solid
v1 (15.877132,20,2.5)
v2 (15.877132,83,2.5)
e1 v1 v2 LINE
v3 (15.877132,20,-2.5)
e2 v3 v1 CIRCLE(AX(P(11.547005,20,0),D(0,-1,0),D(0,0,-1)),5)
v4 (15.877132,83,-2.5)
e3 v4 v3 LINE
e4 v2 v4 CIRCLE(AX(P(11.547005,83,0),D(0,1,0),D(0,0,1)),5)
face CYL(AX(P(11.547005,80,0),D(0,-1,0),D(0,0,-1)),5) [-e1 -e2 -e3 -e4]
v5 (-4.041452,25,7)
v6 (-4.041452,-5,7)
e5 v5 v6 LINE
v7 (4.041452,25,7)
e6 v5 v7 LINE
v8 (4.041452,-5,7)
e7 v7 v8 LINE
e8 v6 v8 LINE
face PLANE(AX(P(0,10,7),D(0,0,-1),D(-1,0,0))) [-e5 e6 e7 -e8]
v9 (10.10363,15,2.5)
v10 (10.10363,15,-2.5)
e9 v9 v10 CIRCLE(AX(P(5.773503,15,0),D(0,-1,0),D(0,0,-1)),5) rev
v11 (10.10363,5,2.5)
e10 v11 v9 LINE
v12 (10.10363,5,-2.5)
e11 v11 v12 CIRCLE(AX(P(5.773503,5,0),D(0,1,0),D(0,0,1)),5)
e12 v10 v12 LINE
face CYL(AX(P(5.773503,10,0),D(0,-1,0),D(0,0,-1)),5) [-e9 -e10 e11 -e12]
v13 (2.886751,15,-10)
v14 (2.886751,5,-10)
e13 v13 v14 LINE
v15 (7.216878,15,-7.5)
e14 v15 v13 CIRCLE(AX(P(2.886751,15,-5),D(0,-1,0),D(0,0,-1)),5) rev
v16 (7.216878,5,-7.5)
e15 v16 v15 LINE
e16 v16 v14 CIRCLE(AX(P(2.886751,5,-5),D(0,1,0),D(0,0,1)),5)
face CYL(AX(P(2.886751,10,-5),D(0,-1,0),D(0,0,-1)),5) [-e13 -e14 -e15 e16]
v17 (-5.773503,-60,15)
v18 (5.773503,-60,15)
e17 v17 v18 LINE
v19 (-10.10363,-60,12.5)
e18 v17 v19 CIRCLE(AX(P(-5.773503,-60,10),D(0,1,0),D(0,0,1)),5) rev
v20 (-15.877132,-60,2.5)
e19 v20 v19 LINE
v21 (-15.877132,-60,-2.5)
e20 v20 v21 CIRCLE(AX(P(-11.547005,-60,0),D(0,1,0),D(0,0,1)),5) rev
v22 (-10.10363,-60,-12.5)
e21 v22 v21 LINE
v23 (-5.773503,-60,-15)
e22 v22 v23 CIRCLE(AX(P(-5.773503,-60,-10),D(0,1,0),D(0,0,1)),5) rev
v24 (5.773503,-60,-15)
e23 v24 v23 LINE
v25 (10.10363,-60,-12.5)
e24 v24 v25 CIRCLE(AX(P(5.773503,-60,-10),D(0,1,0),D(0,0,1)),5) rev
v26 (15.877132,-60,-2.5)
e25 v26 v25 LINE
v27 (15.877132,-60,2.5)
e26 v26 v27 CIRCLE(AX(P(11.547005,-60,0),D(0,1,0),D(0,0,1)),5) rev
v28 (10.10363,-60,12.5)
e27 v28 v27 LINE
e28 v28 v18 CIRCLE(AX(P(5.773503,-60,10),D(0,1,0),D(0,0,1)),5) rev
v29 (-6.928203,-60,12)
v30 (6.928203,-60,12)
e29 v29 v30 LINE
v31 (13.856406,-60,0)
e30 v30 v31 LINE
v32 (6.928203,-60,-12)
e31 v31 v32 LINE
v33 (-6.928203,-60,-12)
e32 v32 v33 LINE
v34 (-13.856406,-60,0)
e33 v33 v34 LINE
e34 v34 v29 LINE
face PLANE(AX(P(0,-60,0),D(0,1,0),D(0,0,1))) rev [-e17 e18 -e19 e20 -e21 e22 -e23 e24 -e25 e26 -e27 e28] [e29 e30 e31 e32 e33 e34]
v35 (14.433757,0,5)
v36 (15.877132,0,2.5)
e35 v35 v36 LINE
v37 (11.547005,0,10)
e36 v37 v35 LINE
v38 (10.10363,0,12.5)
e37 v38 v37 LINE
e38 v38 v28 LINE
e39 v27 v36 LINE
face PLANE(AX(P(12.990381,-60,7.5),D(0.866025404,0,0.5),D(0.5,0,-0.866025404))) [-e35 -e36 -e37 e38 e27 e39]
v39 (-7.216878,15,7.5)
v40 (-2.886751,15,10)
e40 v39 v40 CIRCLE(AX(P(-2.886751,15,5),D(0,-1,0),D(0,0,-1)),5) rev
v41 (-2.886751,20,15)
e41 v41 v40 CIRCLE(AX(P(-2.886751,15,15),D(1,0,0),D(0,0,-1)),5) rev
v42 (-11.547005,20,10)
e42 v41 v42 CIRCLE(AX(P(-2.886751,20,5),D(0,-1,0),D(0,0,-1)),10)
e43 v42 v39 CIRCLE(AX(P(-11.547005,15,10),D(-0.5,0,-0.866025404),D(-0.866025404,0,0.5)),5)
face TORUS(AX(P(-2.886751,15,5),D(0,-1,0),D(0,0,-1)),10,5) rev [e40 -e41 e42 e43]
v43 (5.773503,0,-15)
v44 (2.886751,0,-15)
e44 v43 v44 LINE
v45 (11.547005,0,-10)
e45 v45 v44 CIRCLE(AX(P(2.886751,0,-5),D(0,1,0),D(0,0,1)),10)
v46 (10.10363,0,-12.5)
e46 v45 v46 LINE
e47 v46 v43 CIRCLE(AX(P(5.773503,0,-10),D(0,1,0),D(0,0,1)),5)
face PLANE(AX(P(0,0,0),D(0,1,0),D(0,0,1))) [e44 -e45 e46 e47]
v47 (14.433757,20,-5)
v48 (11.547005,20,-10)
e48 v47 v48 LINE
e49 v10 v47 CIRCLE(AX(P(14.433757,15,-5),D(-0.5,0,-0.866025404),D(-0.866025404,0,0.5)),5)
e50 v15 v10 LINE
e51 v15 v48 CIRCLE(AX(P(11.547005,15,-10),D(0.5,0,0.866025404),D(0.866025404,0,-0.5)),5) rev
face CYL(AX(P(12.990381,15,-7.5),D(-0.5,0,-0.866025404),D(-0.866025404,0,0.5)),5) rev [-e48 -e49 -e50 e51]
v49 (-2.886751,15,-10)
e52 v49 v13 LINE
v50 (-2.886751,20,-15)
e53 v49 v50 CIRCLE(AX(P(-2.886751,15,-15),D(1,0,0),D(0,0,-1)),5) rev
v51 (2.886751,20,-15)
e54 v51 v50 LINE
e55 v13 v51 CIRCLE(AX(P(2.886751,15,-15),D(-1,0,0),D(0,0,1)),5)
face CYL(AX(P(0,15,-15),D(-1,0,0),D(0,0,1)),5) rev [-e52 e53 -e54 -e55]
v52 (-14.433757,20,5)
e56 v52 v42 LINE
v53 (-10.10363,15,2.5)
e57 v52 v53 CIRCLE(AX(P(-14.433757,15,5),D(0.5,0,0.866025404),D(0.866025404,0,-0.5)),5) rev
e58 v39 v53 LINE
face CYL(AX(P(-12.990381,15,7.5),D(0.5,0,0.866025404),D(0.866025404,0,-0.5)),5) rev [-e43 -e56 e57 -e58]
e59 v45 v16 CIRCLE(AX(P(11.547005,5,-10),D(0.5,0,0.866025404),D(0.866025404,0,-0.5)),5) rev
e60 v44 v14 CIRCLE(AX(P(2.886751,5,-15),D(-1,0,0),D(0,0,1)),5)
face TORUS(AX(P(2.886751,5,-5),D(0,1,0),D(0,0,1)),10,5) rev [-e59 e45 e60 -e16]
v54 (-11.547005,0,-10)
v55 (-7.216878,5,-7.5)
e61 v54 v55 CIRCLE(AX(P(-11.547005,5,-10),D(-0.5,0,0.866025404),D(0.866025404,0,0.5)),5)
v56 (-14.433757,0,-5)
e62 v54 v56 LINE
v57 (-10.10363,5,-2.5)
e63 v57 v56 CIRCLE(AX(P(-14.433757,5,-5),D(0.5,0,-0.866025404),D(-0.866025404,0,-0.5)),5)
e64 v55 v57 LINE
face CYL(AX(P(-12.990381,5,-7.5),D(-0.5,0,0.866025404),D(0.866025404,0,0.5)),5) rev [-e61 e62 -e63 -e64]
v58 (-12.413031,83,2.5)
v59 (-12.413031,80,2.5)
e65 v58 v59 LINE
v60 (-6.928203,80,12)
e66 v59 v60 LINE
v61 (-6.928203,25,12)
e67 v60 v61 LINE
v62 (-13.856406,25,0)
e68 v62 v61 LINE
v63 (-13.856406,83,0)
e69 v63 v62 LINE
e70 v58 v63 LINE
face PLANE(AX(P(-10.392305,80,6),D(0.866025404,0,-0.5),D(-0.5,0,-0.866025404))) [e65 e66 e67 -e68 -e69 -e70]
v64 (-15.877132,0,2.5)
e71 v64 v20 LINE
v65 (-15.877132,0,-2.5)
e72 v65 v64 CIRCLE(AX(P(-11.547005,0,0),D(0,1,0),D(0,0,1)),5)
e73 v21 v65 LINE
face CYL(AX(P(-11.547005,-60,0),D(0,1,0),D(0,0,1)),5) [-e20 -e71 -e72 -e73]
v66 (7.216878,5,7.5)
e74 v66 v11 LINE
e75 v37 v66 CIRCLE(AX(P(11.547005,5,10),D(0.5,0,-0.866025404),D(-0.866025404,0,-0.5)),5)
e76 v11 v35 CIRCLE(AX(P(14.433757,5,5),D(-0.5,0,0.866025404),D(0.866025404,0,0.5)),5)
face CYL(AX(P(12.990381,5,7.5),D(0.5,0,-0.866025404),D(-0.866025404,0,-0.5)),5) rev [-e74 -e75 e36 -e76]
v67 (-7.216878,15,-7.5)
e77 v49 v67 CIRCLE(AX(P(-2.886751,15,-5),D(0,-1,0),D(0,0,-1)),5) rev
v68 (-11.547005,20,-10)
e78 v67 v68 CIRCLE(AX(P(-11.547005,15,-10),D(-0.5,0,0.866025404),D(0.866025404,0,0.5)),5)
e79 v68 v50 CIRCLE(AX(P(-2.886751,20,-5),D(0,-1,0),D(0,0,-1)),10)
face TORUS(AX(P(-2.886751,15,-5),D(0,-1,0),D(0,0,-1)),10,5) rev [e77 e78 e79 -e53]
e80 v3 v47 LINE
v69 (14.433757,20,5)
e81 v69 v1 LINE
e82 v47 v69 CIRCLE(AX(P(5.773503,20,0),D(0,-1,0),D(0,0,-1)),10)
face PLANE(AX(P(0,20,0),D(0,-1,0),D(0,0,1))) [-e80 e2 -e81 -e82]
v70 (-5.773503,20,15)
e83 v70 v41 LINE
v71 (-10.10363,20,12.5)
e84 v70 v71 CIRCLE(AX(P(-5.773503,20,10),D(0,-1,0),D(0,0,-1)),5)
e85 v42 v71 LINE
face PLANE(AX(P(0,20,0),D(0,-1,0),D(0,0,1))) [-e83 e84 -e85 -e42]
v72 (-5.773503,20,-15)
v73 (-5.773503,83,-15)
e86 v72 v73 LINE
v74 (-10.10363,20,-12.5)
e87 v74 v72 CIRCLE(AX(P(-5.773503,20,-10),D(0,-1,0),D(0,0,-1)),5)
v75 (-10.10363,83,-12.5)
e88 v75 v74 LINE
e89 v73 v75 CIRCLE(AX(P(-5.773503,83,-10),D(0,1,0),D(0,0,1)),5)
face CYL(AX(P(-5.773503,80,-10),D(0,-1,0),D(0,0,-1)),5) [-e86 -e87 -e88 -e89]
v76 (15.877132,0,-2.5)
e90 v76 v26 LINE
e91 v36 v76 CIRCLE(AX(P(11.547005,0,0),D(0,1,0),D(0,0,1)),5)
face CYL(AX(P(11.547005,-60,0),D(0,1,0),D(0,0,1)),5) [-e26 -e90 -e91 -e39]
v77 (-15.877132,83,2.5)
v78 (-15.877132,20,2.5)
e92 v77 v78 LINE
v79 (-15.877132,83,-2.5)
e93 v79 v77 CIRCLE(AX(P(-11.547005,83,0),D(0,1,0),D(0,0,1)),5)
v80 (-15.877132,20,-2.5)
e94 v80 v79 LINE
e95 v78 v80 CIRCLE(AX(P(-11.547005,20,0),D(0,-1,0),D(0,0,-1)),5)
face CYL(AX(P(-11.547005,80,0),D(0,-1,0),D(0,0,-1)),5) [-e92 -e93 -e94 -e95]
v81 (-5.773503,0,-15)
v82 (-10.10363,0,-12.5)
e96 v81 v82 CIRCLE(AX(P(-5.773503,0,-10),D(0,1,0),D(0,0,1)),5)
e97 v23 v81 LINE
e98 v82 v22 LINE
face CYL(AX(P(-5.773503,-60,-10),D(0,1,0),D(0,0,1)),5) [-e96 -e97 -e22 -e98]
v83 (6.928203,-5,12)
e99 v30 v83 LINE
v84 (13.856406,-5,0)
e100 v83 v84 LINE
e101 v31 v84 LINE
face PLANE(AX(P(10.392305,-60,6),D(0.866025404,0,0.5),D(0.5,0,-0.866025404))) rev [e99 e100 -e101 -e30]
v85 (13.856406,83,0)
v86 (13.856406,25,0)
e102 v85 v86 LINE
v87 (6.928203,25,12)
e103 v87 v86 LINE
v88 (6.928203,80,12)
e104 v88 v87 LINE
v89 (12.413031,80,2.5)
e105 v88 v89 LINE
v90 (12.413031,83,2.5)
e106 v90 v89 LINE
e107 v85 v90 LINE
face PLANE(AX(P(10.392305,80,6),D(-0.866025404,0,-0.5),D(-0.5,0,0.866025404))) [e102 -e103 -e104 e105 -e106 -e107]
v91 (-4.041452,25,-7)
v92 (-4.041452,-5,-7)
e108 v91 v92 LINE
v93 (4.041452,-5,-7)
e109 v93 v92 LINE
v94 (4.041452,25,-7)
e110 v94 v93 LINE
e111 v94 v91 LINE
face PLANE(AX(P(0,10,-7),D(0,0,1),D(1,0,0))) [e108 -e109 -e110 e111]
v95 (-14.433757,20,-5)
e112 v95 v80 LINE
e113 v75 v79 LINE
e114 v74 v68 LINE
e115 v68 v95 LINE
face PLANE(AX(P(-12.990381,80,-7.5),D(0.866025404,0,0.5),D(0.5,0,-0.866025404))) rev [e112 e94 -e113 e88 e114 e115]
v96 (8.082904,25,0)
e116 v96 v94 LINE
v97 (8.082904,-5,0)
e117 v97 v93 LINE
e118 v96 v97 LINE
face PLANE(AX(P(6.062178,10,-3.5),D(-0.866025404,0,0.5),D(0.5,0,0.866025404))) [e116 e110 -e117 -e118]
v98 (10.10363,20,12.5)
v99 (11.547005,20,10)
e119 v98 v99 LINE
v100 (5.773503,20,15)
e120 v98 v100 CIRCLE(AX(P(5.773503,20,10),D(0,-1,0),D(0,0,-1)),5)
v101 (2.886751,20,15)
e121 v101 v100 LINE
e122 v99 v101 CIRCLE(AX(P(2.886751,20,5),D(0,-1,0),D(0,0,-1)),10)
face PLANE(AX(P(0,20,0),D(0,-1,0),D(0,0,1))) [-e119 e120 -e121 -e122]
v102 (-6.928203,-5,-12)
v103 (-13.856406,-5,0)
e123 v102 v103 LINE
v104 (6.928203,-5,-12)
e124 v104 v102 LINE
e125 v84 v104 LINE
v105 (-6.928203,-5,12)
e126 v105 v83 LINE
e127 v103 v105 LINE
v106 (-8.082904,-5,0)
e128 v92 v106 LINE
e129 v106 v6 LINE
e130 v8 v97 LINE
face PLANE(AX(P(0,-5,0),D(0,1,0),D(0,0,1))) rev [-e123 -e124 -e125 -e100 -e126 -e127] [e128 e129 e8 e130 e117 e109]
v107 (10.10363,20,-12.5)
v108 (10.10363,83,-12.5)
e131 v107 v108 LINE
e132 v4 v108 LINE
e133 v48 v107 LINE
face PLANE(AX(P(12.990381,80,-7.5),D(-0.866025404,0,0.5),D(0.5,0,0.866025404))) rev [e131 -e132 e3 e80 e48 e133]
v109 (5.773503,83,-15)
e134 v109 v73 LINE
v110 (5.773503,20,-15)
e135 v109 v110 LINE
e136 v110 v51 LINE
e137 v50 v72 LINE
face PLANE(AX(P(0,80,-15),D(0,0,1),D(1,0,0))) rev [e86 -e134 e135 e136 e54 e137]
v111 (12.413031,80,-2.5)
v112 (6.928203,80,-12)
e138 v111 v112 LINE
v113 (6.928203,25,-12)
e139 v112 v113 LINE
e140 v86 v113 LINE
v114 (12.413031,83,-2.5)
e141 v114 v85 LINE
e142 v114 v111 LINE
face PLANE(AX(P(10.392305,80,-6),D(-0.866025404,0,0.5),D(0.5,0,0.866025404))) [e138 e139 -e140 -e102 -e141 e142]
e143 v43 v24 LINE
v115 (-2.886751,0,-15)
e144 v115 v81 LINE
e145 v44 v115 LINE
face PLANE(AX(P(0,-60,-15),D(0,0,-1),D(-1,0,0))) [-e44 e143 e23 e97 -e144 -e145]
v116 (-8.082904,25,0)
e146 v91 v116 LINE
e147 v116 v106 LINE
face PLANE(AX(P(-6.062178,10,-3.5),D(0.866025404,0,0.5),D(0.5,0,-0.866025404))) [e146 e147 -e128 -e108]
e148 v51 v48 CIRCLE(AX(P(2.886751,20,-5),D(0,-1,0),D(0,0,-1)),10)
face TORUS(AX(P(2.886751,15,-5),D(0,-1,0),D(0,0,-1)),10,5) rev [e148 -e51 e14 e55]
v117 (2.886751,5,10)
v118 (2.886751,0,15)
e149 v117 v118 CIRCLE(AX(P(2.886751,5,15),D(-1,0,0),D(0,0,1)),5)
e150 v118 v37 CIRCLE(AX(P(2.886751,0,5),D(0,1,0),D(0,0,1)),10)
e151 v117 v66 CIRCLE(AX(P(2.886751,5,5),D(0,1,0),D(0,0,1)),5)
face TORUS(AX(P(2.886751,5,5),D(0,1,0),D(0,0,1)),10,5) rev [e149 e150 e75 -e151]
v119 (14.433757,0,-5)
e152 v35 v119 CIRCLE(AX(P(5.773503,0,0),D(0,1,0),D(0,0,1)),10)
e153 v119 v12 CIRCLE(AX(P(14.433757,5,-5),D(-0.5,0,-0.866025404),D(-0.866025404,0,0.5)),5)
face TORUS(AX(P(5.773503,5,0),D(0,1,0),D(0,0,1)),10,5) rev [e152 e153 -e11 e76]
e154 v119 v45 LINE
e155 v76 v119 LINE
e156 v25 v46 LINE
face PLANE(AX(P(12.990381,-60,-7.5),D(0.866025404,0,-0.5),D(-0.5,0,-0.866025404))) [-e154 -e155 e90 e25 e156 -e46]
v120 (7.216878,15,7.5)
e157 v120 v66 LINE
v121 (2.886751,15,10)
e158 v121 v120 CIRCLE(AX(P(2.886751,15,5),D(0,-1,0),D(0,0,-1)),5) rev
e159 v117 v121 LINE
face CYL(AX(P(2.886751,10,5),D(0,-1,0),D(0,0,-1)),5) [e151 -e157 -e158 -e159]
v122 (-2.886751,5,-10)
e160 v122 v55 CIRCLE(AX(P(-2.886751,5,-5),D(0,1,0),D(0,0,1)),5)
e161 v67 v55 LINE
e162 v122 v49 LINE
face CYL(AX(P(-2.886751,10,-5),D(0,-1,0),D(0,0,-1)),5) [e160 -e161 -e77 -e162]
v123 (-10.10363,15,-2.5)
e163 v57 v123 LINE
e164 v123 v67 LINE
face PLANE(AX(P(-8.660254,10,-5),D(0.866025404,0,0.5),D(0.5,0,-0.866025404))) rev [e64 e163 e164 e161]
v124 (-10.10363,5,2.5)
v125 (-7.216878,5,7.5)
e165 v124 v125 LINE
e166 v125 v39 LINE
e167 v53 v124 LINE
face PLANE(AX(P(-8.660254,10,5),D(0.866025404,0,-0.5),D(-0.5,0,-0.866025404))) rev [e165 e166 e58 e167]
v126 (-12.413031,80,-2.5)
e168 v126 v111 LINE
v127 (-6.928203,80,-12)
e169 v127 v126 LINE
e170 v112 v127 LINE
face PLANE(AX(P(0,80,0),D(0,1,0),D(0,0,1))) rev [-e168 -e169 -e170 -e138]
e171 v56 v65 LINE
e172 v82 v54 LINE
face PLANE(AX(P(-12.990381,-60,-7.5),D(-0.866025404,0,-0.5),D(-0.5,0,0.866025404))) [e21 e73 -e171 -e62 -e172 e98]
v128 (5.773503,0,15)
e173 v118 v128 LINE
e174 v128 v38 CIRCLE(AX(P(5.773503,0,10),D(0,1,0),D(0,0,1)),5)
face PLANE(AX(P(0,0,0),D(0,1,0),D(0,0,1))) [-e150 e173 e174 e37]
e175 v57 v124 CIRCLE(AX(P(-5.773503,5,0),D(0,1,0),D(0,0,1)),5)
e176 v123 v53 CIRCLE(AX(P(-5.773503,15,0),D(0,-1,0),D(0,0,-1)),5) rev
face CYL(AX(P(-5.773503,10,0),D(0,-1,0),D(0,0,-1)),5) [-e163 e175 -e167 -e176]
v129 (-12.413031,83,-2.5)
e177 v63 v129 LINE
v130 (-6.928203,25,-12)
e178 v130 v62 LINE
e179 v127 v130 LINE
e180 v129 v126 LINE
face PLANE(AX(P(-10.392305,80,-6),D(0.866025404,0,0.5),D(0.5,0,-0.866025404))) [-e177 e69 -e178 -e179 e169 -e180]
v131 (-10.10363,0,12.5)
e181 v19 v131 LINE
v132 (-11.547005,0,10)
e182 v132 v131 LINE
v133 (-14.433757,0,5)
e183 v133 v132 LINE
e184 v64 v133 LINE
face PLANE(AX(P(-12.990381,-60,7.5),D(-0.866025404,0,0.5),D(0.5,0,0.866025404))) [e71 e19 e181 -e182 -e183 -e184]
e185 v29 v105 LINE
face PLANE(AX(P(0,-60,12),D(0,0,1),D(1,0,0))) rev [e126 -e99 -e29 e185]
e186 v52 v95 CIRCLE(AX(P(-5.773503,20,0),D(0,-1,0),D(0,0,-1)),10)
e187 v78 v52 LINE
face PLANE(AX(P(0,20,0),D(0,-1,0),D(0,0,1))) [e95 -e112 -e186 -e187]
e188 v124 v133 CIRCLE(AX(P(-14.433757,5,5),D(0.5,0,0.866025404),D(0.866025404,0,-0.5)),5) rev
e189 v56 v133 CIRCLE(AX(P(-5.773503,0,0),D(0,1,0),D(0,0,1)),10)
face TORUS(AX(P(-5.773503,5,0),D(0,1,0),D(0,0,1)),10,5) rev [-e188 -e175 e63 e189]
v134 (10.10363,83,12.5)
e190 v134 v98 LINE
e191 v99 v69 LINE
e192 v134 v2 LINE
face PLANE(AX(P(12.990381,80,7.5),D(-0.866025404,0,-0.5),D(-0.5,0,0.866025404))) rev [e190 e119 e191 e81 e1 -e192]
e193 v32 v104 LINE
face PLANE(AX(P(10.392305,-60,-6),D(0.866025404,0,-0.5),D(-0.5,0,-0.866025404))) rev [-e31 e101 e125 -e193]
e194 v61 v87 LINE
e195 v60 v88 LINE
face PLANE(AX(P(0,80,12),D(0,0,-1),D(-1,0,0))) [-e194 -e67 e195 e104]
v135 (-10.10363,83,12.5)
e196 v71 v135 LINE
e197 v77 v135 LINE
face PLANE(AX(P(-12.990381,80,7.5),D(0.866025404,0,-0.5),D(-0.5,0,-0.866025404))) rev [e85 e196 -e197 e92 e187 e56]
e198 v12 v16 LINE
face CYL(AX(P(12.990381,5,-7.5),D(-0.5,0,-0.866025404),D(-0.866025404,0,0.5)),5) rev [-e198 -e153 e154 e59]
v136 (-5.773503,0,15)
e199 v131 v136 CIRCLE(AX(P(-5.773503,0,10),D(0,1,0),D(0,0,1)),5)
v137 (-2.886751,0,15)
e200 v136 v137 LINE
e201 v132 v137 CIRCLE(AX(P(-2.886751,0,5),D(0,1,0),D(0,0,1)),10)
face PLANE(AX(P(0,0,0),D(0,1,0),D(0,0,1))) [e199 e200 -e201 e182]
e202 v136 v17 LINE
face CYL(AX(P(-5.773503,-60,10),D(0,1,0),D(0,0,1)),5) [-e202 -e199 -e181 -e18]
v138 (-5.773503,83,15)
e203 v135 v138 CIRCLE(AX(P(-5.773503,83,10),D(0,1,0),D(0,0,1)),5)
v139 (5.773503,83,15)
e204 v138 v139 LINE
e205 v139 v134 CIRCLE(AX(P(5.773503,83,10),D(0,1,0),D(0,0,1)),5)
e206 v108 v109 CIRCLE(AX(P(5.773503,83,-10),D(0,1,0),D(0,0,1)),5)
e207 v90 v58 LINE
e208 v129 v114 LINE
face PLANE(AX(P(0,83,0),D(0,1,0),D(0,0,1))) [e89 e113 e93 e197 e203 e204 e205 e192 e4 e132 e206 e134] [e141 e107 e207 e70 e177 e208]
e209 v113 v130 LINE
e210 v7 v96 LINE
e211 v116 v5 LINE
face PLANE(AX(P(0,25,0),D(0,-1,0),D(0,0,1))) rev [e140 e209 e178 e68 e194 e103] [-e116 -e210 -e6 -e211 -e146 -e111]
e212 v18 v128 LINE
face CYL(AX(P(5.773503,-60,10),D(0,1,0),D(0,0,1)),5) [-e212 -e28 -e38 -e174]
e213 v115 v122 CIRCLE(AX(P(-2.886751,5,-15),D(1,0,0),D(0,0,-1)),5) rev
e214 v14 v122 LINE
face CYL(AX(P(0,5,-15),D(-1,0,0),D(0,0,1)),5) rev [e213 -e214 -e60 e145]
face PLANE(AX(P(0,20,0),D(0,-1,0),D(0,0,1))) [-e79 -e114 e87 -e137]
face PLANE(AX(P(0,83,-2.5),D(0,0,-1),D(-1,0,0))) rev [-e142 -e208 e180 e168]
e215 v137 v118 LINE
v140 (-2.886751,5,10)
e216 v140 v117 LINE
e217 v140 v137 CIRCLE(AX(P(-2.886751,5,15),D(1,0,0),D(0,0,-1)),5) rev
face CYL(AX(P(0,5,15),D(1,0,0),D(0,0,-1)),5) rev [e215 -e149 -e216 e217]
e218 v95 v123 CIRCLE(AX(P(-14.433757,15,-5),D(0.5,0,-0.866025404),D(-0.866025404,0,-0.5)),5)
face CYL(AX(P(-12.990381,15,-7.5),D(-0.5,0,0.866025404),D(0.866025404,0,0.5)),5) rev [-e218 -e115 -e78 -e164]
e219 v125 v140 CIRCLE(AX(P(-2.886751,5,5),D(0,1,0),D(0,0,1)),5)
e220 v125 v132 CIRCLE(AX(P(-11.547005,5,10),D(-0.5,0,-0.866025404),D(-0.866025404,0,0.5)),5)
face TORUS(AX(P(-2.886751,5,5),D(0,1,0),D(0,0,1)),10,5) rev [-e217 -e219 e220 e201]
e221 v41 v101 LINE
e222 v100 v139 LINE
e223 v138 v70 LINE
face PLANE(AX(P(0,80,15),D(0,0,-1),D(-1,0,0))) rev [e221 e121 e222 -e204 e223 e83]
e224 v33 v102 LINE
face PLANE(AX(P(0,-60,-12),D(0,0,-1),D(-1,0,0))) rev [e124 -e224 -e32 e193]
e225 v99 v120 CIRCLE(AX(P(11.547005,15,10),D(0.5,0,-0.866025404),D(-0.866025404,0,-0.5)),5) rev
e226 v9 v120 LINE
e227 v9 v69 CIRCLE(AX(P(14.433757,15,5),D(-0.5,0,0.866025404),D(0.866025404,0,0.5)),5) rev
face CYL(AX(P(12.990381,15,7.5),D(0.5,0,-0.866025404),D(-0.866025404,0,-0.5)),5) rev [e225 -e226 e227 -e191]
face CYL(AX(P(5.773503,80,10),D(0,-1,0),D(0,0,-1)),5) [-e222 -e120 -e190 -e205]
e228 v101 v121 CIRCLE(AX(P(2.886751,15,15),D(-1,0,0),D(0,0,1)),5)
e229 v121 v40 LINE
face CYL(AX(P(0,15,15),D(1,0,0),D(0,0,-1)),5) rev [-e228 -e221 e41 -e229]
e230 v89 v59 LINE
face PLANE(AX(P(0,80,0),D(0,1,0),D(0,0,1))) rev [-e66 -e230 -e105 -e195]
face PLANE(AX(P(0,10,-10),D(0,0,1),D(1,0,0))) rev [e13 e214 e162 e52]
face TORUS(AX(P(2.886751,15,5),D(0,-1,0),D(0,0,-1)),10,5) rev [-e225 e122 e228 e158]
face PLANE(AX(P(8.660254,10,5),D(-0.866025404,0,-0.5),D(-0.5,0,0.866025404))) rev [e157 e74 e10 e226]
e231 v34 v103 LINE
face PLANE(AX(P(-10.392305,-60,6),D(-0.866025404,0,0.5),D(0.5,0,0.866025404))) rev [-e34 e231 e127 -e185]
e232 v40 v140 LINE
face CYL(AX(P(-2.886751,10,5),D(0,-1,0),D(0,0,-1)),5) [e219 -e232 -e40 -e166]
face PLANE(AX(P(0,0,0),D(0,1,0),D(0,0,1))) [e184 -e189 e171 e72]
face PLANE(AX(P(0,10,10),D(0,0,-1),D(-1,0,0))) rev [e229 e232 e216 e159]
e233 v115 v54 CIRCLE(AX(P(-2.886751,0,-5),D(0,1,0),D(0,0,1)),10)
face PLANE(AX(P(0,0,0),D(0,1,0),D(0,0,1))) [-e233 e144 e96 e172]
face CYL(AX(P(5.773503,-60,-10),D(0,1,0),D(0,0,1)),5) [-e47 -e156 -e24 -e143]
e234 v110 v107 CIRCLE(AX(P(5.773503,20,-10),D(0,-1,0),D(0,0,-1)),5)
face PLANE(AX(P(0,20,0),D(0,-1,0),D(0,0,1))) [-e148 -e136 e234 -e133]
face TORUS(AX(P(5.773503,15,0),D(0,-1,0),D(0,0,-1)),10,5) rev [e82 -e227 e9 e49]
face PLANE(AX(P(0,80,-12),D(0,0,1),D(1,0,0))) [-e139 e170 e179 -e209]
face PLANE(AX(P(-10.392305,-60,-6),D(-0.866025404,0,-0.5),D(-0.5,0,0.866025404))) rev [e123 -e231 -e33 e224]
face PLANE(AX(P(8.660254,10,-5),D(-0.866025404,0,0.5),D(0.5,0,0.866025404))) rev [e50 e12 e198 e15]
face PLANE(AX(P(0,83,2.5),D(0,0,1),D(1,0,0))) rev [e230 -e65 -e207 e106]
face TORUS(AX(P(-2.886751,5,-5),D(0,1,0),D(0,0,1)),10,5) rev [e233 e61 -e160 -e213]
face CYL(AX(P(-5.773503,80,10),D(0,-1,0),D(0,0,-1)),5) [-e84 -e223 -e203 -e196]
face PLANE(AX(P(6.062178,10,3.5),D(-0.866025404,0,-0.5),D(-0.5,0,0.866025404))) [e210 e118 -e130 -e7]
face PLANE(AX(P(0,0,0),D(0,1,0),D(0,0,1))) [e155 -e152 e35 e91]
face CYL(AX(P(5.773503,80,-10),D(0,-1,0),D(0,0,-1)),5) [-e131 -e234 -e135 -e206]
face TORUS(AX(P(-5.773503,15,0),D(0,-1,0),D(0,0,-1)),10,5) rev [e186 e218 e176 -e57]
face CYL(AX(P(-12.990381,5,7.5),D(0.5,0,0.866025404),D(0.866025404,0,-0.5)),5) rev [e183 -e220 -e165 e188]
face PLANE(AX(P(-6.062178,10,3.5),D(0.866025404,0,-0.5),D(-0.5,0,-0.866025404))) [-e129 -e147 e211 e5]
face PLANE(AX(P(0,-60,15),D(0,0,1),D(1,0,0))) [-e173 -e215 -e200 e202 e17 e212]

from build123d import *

# Parameters (mm, degrees)
BOSS_EXTRUDE1_DEPTH  = 10
BOSS_EXTRUDE2_DEPTH  = 5
BOSS_EXTRUDE3_DEPTH  = 60
FILLET1_R            = 5
FILLET1_OF_MIRROR1_R = 5
BOSS_EXTRUDE4_DEPTH  = 3
FILLET2_R            = 5


with BuildPart() as part:
    # Sketch1 → Boss-Extrude1 (new body)
    with BuildSketch(Plane(origin=(0, 0, 0), x_dir=(1, 0, 0), z_dir=(0, 1, 0))):
        Polygon((-5.773502692, -10), (5.773502692, -10), (11.547005384, 0), (5.773502692, 10), (-5.773502692, 10), (-11.547005384, 0), align=None)
        Polygon((-4.041451884, -7), (4.041451884, -7), (8.082903769, 0), (4.041451884, 7), (-4.041451884, 7), (-8.082903769, 0), align=None, mode=Mode.SUBTRACT)
    boss_extrude1 = extrude(amount=BOSS_EXTRUDE1_DEPTH)

    # Sketch1<3> → Boss-Extrude2 (add)
    # profile 1 of 2: a face of its own
    with BuildSketch(Plane(origin=(0, 0, 0), x_dir=(1, 0, 0), z_dir=(0, 1, 0))):
        Polygon((-6.92820323, -12), (6.92820323, -12), (13.856406461, 0), (6.92820323, 12), (-6.92820323, 12), (-13.856406461, 0), align=None)
        Polygon((5.773502692, -10), (11.547005384, 0), (5.773502692, 10), (-5.773502692, 10), (-11.547005384, 0), (-5.773502692, -10), align=None, mode=Mode.SUBTRACT)
    # profile 2 of 2: a face of its own
    with BuildSketch(Plane(origin=(0, 0, 0), x_dir=(1, 0, 0), z_dir=(0, 1, 0))):
        Polygon((-5.773502692, -10), (5.773502692, -10), (11.547005384, 0), (5.773502692, 10), (-5.773502692, 10), (-11.547005384, 0), align=None)
        Polygon((-4.041451884, -7), (4.041451884, -7), (8.082903769, 0), (4.041451884, 7), (-4.041451884, 7), (-8.082903769, 0), align=None, mode=Mode.SUBTRACT)
    boss_extrude2 = extrude(amount=-BOSS_EXTRUDE2_DEPTH)

    # Sketch1<4> → Boss-Extrude3 (add)
    with BuildSketch(Plane(origin=(0, 0, 0), x_dir=(1, 0, 0), z_dir=(0, 1, 0))):
        Polygon((-8.660254038, -15), (8.660254038, -15), (17.320508076, 0), (8.660254038, 15), (-8.660254038, 15), (-17.320508076, 0), align=None)
        Polygon((6.92820323, -12), (13.856406461, 0), (6.92820323, 12), (-6.92820323, 12), (-13.856406461, 0), (-6.92820323, -12), align=None, mode=Mode.SUBTRACT)
    boss_extrude3 = extrude(amount=-BOSS_EXTRUDE3_DEPTH)

    # Fillet1
    fillet1_edges = [part.edges().sort_by_distance(p)[0] for p in [
        (8.660254038, -30, 15),
        (-8.660254038, -30, 15),
        (-17.320508076, -30, 0),
        (-8.660254038, -30, -15),
        (8.660254038, -30, -15),
        (17.320508076, -30, 0),
    ]]
    fillet(fillet1_edges, radius=FILLET1_R)

    # Mirror1: Boss-Extrude1, Boss-Extrude2, Boss-Extrude3 across plane
    add(boss_extrude1.mirror(Plane.ZX.offset(10)))
    add(boss_extrude2.mirror(Plane.ZX.offset(10)))
    add(boss_extrude3.mirror(Plane.ZX.offset(10)))

    # Fillet1 of Mirror1
    fillet1_of_mirror1_edges = [part.edges().sort_by_distance(p)[0] for p in [
        (8.660254038, 50, 15),
        (-8.660254038, 50, 15),
        (-17.320508076, 50, 0),
        (-8.660254038, 50, -15),
        (8.660254038, 50, -15),
        (17.320508076, 50, 0),
    ]]
    fillet(fillet1_of_mirror1_edges, radius=FILLET1_OF_MIRROR1_R)

    # Sketch2 → Boss-Extrude4 (add)
    # profile 1 of 6: a face of its own
    with BuildSketch(Plane(origin=(0, 80, 0), x_dir=(1, 0, 0), z_dir=(0, 1, 0))):
        with BuildLine():
            ThreePointArc((10.103629711, 12.5), (8.273502692, 14.330127019), (5.773502692, 15))
            Line((5.773502692, 15), (-5.773502692, 15))
            ThreePointArc((-5.773502692, 15), (-8.273502692, 14.330127019), (-10.103629711, 12.5))
            Line((-10.103629711, 12.5), (-15.877132403, 2.5))
            ThreePointArc((-15.877132403, 2.5), (-16.547005384, 0), (-15.877132403, -2.5))
            Line((-15.877132403, -2.5), (-10.103629711, -12.5))
            ThreePointArc((-10.103629711, -12.5), (-8.273502692, -14.330127019), (-5.773502692, -15))
            Line((-5.773502692, -15), (5.773502692, -15))
            ThreePointArc((5.773502692, -15), (8.273502692, -14.330127019), (10.103629711, -12.5))
            Line((10.103629711, -12.5), (15.877132403, -2.5))
            ThreePointArc((15.877132403, -2.5), (16.547005384, 0), (15.877132403, 2.5))
            Line((15.877132403, 2.5), (10.103629711, 12.5))
        make_face()
        Polygon((6.92820323, 12), (13.856406461, 0), (6.92820323, -12), (-6.92820323, -12), (-13.856406461, 0), (-6.92820323, 12), align=None, mode=Mode.SUBTRACT)
    # profile 2 of 6: a face of its own
    with BuildSketch(Plane(origin=(0, 80, 0), x_dir=(1, 0, 0), z_dir=(0, 1, 0))):
        Polygon((-6.92820323, 12), (-12.413030788, 2.5), (12.413030788, 2.5), (6.92820323, 12), align=None)
    # profile 3 of 6: a face of its own
    with BuildSketch(Plane(origin=(0, 80, 0), x_dir=(1, 0, 0), z_dir=(0, 1, 0))):
        Polygon((12.413030788, -2.5), (-12.413030788, -2.5), (-6.92820323, -12), (6.92820323, -12), align=None)
    # profile 4 of 6: a face of its own
    with BuildSketch(Plane(origin=(0, 80, 0), x_dir=(1, 0, 0), z_dir=(0, 1, 0))):
        with BuildLine():
            Line((-12.413030788, -2.5), (-15.877132403, -2.5))
            Line((-15.877132403, -2.5), (-10.103629711, -12.5))
            ThreePointArc((-10.103629711, -12.5), (-8.273502692, -14.330127019), (-5.773502692, -15))
            Line((-5.773502692, -15), (5.773502692, -15))
            ThreePointArc((5.773502692, -15), (8.273502692, -14.330127019), (10.103629711, -12.5))
            Line((10.103629711, -12.5), (15.877132403, -2.5))
            Line((15.877132403, -2.5), (12.413030788, -2.5))
            Line((12.413030788, -2.5), (6.92820323, -12))
            Line((6.92820323, -12), (-6.92820323, -12))
            Line((-6.92820323, -12), (-12.413030788, -2.5))
        make_face()
    # profile 5 of 6: a face of its own
    with BuildSketch(Plane(origin=(0, 80, 0), x_dir=(1, 0, 0), z_dir=(0, 1, 0))):
        with BuildLine():
            Line((15.877132403, 2.5), (12.413030788, 2.5))
            Line((12.413030788, 2.5), (13.856406461, 0))
            Line((13.856406461, 0), (12.413030788, -2.5))
            Line((12.413030788, -2.5), (15.877132403, -2.5))
            ThreePointArc((15.877132403, -2.5), (16.547005384, 0), (15.877132403, 2.5))
        make_face()
    # profile 6 of 6: a face of its own
    with BuildSketch(Plane(origin=(0, 80, 0), x_dir=(1, 0, 0), z_dir=(0, 1, 0))):
        with BuildLine():
            Line((-12.413030788, 2.5), (-15.877132403, 2.5))
            ThreePointArc((-15.877132403, 2.5), (-16.547005384, 0), (-15.877132403, -2.5))
            Line((-15.877132403, -2.5), (-12.413030788, -2.5))
            Line((-12.413030788, -2.5), (-13.856406461, 0))
            Line((-13.856406461, 0), (-12.413030788, 2.5))
        make_face()
    extrude(amount=BOSS_EXTRUDE4_DEPTH)

    # Fillet2
    fillet2_edges = [part.edges().sort_by_distance(p)[0] for p in [
        (-8.660254038, 0, 5),
        (-8.660254038, 0, -5),
        (0, 0, -10),
        (8.660254038, 0, -5),
        (0, 20, 10),
        (8.660254038, 20, 5),
        (8.660254038, 20, -5),
        (0, 20, -10),
        (-8.660254038, 20, -5),
        (-8.660254038, 20, 5),
        (8.660254038, 0, 5),
        (0, 0, 10),
        (-5.773502692, 10, 10),
        (-11.547005384, 10, 0),
        (-5.773502692, 10, -10),
        (5.773502692, 10, -10),
        (11.547005384, 10, 0),
        (5.773502692, 10, 10),
    ]]
    fillet(fillet2_edges, radius=FILLET2_R - 0.0001)  # a hair under: the kernel refuses the full size


solid = part.part
